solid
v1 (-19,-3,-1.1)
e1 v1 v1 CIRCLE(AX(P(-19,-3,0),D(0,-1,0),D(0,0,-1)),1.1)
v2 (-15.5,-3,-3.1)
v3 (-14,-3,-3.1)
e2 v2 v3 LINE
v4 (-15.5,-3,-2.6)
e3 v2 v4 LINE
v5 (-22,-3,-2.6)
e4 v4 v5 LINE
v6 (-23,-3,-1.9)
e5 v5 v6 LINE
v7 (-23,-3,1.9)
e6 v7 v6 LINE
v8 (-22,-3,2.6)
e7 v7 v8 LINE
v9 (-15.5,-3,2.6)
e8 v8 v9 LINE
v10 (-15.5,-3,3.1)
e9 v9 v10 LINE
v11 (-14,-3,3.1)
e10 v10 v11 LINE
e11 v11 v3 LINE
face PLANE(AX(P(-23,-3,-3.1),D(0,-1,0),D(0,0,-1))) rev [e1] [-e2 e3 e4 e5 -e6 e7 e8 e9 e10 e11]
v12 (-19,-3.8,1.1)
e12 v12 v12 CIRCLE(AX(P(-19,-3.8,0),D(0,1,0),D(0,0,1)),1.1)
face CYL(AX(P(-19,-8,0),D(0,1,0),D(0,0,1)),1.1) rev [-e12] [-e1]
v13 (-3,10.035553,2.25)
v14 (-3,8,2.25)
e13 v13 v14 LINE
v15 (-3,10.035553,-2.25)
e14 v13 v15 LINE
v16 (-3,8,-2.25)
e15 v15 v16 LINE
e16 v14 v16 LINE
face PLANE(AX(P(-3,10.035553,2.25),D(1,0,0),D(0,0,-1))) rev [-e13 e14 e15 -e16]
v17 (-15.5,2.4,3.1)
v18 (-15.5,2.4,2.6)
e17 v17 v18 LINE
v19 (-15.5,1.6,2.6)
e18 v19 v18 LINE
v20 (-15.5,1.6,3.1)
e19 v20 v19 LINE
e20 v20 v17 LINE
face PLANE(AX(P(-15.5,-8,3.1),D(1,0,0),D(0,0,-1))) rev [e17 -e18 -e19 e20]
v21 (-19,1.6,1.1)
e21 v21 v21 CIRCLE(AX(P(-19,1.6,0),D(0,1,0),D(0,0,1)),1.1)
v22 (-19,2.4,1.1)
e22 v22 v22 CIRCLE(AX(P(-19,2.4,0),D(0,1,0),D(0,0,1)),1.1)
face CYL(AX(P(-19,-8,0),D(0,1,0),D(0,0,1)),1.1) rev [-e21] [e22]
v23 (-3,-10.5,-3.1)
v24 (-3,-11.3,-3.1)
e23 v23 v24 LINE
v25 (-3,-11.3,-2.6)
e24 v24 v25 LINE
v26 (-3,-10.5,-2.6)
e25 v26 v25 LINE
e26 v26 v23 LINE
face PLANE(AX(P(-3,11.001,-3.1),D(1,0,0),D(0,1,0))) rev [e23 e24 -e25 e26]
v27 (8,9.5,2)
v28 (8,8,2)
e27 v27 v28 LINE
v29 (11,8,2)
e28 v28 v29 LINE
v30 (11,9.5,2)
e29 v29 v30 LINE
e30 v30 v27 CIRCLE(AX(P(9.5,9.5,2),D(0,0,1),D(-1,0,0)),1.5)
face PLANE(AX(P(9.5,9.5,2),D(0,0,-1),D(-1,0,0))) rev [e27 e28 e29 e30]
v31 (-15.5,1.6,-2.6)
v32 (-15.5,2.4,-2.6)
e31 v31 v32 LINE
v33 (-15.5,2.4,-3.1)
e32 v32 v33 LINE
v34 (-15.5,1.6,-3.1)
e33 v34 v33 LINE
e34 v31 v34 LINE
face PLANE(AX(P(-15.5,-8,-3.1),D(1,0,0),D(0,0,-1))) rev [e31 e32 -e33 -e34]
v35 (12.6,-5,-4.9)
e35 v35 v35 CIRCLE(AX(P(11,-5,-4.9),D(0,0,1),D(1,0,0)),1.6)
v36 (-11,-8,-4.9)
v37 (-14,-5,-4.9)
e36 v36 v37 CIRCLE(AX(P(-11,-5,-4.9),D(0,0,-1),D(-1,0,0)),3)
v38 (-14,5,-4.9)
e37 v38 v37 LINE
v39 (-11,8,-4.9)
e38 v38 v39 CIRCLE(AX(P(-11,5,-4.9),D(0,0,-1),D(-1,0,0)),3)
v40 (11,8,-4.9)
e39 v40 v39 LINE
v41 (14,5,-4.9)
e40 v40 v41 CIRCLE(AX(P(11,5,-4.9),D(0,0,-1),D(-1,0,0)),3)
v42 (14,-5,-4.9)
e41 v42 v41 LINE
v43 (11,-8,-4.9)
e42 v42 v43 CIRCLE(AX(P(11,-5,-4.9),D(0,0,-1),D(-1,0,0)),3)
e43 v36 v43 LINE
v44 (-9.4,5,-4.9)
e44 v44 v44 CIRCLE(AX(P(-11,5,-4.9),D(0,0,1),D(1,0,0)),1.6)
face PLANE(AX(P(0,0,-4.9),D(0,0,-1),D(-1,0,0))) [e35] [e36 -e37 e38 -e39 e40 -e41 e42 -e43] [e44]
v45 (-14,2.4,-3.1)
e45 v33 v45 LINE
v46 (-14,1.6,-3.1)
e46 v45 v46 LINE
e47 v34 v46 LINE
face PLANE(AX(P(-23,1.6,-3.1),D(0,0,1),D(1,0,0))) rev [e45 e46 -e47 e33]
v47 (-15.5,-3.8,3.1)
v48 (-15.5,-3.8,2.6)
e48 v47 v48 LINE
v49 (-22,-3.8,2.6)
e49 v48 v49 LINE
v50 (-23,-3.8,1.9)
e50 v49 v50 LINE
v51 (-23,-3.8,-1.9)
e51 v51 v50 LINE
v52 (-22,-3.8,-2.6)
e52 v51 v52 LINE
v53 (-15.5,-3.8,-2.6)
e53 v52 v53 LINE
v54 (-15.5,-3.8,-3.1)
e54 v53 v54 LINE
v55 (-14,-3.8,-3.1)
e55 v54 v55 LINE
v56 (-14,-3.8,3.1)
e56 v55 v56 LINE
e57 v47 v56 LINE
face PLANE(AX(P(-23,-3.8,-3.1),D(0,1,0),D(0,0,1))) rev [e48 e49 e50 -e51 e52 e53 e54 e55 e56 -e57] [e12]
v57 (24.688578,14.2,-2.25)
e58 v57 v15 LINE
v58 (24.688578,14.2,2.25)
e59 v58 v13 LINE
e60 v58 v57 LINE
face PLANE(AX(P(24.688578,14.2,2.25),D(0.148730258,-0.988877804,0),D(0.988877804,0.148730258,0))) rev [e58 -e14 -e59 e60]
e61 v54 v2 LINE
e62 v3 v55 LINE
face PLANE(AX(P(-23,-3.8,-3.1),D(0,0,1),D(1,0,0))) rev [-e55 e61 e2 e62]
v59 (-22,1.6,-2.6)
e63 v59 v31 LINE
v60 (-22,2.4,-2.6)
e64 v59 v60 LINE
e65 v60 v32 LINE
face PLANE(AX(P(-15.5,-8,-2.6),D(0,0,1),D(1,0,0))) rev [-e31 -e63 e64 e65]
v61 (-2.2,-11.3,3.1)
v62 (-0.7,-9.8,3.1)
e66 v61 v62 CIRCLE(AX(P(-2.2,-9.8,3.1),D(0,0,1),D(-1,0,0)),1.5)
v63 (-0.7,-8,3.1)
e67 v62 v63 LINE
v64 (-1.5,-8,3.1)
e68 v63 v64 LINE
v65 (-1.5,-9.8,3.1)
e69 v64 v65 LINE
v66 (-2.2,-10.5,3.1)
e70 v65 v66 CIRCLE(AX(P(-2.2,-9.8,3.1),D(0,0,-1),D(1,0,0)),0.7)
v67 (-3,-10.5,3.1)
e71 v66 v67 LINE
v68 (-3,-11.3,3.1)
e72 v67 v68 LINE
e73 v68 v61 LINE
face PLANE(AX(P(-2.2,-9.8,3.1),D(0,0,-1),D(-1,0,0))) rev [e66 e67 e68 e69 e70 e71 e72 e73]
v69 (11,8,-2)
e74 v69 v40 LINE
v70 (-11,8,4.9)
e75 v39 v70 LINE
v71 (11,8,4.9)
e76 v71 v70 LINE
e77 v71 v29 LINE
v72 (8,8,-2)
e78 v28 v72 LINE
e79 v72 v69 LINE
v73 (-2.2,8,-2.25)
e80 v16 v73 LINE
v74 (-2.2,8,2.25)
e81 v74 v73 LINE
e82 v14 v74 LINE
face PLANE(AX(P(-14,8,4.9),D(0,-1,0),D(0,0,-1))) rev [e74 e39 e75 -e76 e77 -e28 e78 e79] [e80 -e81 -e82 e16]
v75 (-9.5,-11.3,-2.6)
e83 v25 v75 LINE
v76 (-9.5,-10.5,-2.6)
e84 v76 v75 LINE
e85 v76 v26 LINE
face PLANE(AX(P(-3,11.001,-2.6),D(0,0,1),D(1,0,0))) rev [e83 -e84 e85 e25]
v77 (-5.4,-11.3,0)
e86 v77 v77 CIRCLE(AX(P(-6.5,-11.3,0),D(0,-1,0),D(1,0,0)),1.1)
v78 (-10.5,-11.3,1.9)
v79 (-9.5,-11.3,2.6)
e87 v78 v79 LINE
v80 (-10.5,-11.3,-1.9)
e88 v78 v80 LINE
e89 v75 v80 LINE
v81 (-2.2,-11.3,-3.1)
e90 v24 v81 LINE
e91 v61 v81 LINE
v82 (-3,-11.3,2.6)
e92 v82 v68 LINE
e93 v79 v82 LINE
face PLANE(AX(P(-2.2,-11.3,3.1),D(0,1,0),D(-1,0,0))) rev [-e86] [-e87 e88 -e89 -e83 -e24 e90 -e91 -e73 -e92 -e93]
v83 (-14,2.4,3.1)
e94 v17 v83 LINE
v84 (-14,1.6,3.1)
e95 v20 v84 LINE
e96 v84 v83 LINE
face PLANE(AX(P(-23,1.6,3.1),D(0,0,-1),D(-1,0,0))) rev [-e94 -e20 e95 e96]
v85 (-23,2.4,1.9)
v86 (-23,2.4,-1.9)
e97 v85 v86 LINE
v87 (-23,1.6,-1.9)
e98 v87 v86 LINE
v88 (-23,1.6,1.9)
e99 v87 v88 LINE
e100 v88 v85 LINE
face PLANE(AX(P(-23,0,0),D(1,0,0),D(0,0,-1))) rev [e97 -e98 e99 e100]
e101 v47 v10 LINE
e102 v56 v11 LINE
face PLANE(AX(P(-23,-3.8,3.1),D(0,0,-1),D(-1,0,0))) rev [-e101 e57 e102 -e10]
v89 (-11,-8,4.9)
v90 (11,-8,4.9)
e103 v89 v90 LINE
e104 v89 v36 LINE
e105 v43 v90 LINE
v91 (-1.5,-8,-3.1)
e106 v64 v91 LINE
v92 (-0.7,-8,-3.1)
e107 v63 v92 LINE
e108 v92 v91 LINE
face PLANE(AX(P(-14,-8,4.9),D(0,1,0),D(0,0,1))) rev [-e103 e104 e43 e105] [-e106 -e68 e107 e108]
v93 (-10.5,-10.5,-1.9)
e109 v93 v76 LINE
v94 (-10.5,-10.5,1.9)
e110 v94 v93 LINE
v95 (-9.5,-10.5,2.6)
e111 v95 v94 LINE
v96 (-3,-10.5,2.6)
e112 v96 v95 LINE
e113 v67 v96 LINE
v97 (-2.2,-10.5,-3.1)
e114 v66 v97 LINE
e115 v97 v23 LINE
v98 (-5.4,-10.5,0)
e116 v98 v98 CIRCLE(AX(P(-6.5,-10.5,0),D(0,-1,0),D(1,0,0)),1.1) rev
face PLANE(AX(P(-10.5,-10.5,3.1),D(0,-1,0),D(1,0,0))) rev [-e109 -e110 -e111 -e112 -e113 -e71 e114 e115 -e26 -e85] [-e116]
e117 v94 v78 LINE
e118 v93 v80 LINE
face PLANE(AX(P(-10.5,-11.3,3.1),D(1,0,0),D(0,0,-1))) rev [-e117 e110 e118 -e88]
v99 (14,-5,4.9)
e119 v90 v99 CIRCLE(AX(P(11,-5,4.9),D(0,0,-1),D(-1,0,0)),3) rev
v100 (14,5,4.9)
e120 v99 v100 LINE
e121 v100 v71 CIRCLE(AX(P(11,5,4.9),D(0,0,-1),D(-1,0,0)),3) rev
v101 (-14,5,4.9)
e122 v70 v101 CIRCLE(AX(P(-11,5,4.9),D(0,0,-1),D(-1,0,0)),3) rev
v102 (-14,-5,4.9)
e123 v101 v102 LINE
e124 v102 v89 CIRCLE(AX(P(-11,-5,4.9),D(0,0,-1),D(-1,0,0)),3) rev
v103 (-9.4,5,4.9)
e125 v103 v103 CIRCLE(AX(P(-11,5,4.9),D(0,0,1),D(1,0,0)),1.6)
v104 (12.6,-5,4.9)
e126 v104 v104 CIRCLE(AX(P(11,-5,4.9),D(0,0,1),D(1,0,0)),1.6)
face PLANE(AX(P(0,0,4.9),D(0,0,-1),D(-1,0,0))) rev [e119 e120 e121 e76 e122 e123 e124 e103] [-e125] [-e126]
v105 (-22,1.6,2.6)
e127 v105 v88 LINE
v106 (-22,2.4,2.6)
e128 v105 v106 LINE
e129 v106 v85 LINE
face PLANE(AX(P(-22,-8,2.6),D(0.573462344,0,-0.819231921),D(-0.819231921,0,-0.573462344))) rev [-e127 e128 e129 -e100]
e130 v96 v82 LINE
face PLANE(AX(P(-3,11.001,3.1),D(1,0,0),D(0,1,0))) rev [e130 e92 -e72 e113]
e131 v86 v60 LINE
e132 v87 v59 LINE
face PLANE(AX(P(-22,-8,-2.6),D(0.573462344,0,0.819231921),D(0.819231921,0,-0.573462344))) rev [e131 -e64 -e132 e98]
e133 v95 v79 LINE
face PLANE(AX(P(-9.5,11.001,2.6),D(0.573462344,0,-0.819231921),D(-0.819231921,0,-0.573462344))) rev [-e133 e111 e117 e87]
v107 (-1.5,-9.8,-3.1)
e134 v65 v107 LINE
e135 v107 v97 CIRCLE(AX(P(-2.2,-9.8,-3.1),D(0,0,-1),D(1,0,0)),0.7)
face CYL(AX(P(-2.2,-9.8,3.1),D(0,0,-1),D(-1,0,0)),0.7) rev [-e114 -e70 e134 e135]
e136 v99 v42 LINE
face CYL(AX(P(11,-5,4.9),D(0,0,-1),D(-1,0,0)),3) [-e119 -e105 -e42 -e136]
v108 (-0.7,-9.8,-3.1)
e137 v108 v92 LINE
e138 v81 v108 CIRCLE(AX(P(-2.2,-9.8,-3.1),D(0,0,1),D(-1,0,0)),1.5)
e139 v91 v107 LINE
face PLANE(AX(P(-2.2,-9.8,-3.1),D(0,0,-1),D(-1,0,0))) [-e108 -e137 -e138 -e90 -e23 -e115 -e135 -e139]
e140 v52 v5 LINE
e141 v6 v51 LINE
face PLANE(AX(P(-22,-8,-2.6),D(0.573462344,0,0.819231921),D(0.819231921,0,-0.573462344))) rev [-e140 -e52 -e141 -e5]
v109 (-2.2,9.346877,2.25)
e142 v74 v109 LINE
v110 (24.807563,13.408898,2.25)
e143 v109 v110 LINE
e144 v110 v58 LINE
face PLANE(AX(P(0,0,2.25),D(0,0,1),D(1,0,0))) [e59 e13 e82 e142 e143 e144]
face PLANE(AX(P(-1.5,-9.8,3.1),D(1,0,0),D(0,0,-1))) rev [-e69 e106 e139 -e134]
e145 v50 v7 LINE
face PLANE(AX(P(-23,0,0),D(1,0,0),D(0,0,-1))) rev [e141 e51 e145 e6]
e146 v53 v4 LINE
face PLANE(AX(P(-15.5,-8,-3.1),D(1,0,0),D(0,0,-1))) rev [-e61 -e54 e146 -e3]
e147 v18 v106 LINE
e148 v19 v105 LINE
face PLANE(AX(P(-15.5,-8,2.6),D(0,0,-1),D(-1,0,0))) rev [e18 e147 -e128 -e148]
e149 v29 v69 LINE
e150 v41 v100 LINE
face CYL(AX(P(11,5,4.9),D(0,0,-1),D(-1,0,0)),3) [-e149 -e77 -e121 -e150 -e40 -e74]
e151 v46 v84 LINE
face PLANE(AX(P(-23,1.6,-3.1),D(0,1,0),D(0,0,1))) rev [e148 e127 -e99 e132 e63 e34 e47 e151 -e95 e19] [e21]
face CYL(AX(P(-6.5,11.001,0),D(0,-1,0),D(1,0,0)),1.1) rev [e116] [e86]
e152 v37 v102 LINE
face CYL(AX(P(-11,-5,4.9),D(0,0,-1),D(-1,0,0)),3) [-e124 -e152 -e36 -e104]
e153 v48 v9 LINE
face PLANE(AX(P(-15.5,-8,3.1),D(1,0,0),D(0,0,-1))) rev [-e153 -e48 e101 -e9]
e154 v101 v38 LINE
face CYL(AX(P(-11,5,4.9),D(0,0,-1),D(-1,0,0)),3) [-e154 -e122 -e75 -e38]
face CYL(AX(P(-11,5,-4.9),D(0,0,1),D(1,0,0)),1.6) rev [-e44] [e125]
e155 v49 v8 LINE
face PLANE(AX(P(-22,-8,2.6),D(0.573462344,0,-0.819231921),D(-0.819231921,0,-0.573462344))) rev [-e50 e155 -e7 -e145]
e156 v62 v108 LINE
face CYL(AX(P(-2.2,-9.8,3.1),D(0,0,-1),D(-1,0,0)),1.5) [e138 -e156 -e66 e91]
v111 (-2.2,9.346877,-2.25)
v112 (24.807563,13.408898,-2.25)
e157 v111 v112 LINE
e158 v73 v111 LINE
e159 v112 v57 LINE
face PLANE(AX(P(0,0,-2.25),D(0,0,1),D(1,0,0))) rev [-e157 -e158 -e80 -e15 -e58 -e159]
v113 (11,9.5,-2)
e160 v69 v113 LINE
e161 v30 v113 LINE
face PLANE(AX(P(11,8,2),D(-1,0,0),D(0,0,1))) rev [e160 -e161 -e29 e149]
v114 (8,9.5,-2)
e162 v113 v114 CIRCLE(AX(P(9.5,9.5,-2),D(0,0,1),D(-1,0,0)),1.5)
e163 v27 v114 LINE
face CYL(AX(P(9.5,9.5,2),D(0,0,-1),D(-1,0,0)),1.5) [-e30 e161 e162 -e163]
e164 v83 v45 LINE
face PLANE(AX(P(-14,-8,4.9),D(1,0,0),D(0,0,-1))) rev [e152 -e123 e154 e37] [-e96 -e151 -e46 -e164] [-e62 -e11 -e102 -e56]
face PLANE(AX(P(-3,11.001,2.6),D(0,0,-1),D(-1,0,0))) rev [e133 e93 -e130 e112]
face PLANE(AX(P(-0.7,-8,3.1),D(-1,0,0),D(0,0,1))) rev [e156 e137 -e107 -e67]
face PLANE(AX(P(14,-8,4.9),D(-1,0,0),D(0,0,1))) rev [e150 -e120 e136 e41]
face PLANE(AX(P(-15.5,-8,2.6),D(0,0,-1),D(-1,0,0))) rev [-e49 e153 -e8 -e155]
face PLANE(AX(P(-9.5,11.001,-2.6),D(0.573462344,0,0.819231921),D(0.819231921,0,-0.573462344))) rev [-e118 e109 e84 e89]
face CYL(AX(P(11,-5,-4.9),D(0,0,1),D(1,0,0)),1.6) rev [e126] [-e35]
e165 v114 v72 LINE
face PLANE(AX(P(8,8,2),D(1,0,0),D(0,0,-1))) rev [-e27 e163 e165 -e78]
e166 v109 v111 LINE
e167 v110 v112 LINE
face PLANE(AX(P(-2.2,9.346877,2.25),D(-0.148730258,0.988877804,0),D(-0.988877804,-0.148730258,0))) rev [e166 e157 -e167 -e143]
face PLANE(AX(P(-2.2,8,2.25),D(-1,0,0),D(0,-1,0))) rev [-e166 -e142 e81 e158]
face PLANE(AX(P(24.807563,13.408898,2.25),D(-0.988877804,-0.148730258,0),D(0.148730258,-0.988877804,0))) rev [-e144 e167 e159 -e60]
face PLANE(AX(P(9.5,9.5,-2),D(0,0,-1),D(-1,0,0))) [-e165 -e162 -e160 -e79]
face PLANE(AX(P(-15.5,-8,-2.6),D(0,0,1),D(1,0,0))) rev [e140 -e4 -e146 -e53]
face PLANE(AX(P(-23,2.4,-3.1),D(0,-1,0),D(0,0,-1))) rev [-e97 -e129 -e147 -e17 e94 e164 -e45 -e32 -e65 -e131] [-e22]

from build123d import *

# Parameters (mm, degrees)
SKETCH_1_W          = 28
SKETCH_1_H          = 16
EXTRUDE_1_DEPTH     = 4.9
EXTRUDE_2_DEPTH     = 2
SKETCH_3_W          = 6.2
SKETCH_3_H          = 0.8
EXTRUDE_3_DEPTH     = 9
SKETCH_4_R          = 1.1
CUT_EXTRUDE_1_DEPTH = 26.713226169
EXTRUDE_4_DEPTH     = 3.1
CUT_EXTRUDE_2_REACH = 34.408
SKETCH_6_R          = 1.1
EXTRUDE_10_DEPTH    = 2.25
FILLET_1_R          = 3
SKETCH_8_R          = 1.6
CUT_EXTRUDE_3_DEPTH = 31.217464609


with BuildPart() as part:
    # 草图1 → 凸台-拉伸1 (new, symmetric)
    with BuildSketch(Plane.XY):
        Rectangle(SKETCH_1_W, SKETCH_1_H)
    extrude(amount=EXTRUDE_1_DEPTH, both=True)

    # 草图2 → 凸台-拉伸2 (add, symmetric)
    with BuildSketch(Plane.XY):
        with BuildLine():
            Line((8, 8), (11, 8))
            Line((11, 8), (11, 9.5))
            ThreePointArc((11, 9.5), (9.5, 11), (8, 9.5))
            Line((8, 9.5), (8, 8))
        make_face()
    extrude(amount=EXTRUDE_2_DEPTH, both=True)

    # 草图3 → 凸台-拉伸3 (add)
    with BuildSketch(Plane.ZY.offset(14)):
        with Locations((0, 2)):
            Rectangle(SKETCH_3_W, SKETCH_3_H)
        with Locations((0, -3.4)):
            Rectangle(SKETCH_3_W, SKETCH_3_H)
    extrude(amount=EXTRUDE_3_DEPTH)

    # 草图4 → 切除-拉伸1 (cut, through all)
    with BuildSketch(Plane(origin=(0, 2.4, 0), x_dir=(1, 0, 0), z_dir=(0, 1, 0))):
        with Locations(Location((-19, 0, 0), (0, 0, 270))):
            Circle(SKETCH_4_R)
        Polygon((-15.5, 3.1), (-15.5, 2.6), (-22, 2.6), (-23, 1.9), (-23, 3.1), align=None)
        Polygon((-23, -3.1), (-15.5, -3.1), (-15.5, -2.6), (-22, -2.6), (-23, -1.9), align=None)
    extrude(amount=-CUT_EXTRUDE_1_DEPTH, mode=Mode.SUBTRACT)

    # 草图5 → 凸台-拉伸4 (add, symmetric)
    with BuildSketch(Plane.XY):
        with BuildLine():
            Line((-1.5, -8), (-0.7, -8))
            Line((-0.7, -8), (-0.7, -9.8))
            ThreePointArc((-0.7, -9.8), (-1.139339828, -10.860660172), (-2.2, -11.3))
            Line((-2.2, -11.3), (-10.5, -11.3))
            Line((-10.5, -11.3), (-10.5, -10.5))
            Line((-10.5, -10.5), (-2.2, -10.5))
            ThreePointArc((-2.2, -10.5), (-1.705025253, -10.294974747), (-1.5, -9.8))
            Line((-1.5, -9.8), (-1.5, -8))
        make_face()
    extrude(amount=EXTRUDE_4_DEPTH, both=True)

    # 草图6 → 切除-拉伸2 (cut, up to next)
    with BuildSketch(Plane.XZ.offset(11.3), mode=Mode.PRIVATE) as cut_extrude_2_sk1:
        with Locations((-6.5, 0)):
            Circle(SKETCH_6_R)
    cut_extrude_2_tool1 = extrude(cut_extrude_2_sk1.sketch, amount=-CUT_EXTRUDE_2_REACH, mode=Mode.PRIVATE) & part.part
    # 草图6 → 切除-拉伸2 (cut, up to next)
    with BuildSketch(Plane.XZ.offset(11.3), mode=Mode.PRIVATE) as cut_extrude_2_sk2:
        Polygon((-3, 3.1), (-3, 2.6), (-9.5, 2.6), (-10.5, 1.9), (-10.5, 3.1), align=None)
    cut_extrude_2_tool2 = extrude(cut_extrude_2_sk2.sketch, amount=-CUT_EXTRUDE_2_REACH, mode=Mode.PRIVATE) & part.part
    # 草图6 → 切除-拉伸2 (cut, up to next)
    with BuildSketch(Plane.XZ.offset(11.3), mode=Mode.PRIVATE) as cut_extrude_2_sk3:
        Polygon((-10.5, -3.1), (-3, -3.1), (-3, -2.6), (-9.5, -2.6), (-10.5, -1.9), align=None)
    cut_extrude_2_tool3 = extrude(cut_extrude_2_sk3.sketch, amount=-CUT_EXTRUDE_2_REACH, mode=Mode.PRIVATE) & part.part
    add(cut_extrude_2_tool1.solids().sort_by_distance((-6.5, -11.3, 0))[0], mode=Mode.SUBTRACT)
    add(cut_extrude_2_tool2.solids().sort_by_distance((-7.041667, -11.3, 2.80874))[0], mode=Mode.SUBTRACT)
    add(cut_extrude_2_tool3.solids().sort_by_distance((-7.041667, -11.3, -2.80874))[0], mode=Mode.SUBTRACT)

    # 草图7 → 凸台-拉伸10 (add, symmetric)
    with BuildSketch(Plane.XY):
        Polygon((-3, 8), (-2.2, 8), (-2.2, 9.346877402), (24.807562706, 13.408897757), (24.6885785, 14.2), (-3, 10.035552778), align=None)
    extrude(amount=EXTRUDE_10_DEPTH, both=True)

    # 圆角1
    fillet_1_edges = [part.edges().sort_by_distance(p)[0] for p in [
        (14, -8, 0),
        (-14, -8, 0),
        (-14, 8, 0),
        (14, 8, 0),
    ]]
    fillet(fillet_1_edges, radius=FILLET_1_R - 0.0001)  # a hair under: the kernel refuses the full size

    # 草图8 → 切除-拉伸3 (cut, through all)
    with BuildSketch(Plane.XY.offset(4.9)):
        with Locations((-11, 5)):
            Circle(SKETCH_8_R)
        with Locations((11, -5)):
            Circle(SKETCH_8_R)
    extrude(amount=-CUT_EXTRUDE_3_DEPTH, mode=Mode.SUBTRACT)


solid = part.part
